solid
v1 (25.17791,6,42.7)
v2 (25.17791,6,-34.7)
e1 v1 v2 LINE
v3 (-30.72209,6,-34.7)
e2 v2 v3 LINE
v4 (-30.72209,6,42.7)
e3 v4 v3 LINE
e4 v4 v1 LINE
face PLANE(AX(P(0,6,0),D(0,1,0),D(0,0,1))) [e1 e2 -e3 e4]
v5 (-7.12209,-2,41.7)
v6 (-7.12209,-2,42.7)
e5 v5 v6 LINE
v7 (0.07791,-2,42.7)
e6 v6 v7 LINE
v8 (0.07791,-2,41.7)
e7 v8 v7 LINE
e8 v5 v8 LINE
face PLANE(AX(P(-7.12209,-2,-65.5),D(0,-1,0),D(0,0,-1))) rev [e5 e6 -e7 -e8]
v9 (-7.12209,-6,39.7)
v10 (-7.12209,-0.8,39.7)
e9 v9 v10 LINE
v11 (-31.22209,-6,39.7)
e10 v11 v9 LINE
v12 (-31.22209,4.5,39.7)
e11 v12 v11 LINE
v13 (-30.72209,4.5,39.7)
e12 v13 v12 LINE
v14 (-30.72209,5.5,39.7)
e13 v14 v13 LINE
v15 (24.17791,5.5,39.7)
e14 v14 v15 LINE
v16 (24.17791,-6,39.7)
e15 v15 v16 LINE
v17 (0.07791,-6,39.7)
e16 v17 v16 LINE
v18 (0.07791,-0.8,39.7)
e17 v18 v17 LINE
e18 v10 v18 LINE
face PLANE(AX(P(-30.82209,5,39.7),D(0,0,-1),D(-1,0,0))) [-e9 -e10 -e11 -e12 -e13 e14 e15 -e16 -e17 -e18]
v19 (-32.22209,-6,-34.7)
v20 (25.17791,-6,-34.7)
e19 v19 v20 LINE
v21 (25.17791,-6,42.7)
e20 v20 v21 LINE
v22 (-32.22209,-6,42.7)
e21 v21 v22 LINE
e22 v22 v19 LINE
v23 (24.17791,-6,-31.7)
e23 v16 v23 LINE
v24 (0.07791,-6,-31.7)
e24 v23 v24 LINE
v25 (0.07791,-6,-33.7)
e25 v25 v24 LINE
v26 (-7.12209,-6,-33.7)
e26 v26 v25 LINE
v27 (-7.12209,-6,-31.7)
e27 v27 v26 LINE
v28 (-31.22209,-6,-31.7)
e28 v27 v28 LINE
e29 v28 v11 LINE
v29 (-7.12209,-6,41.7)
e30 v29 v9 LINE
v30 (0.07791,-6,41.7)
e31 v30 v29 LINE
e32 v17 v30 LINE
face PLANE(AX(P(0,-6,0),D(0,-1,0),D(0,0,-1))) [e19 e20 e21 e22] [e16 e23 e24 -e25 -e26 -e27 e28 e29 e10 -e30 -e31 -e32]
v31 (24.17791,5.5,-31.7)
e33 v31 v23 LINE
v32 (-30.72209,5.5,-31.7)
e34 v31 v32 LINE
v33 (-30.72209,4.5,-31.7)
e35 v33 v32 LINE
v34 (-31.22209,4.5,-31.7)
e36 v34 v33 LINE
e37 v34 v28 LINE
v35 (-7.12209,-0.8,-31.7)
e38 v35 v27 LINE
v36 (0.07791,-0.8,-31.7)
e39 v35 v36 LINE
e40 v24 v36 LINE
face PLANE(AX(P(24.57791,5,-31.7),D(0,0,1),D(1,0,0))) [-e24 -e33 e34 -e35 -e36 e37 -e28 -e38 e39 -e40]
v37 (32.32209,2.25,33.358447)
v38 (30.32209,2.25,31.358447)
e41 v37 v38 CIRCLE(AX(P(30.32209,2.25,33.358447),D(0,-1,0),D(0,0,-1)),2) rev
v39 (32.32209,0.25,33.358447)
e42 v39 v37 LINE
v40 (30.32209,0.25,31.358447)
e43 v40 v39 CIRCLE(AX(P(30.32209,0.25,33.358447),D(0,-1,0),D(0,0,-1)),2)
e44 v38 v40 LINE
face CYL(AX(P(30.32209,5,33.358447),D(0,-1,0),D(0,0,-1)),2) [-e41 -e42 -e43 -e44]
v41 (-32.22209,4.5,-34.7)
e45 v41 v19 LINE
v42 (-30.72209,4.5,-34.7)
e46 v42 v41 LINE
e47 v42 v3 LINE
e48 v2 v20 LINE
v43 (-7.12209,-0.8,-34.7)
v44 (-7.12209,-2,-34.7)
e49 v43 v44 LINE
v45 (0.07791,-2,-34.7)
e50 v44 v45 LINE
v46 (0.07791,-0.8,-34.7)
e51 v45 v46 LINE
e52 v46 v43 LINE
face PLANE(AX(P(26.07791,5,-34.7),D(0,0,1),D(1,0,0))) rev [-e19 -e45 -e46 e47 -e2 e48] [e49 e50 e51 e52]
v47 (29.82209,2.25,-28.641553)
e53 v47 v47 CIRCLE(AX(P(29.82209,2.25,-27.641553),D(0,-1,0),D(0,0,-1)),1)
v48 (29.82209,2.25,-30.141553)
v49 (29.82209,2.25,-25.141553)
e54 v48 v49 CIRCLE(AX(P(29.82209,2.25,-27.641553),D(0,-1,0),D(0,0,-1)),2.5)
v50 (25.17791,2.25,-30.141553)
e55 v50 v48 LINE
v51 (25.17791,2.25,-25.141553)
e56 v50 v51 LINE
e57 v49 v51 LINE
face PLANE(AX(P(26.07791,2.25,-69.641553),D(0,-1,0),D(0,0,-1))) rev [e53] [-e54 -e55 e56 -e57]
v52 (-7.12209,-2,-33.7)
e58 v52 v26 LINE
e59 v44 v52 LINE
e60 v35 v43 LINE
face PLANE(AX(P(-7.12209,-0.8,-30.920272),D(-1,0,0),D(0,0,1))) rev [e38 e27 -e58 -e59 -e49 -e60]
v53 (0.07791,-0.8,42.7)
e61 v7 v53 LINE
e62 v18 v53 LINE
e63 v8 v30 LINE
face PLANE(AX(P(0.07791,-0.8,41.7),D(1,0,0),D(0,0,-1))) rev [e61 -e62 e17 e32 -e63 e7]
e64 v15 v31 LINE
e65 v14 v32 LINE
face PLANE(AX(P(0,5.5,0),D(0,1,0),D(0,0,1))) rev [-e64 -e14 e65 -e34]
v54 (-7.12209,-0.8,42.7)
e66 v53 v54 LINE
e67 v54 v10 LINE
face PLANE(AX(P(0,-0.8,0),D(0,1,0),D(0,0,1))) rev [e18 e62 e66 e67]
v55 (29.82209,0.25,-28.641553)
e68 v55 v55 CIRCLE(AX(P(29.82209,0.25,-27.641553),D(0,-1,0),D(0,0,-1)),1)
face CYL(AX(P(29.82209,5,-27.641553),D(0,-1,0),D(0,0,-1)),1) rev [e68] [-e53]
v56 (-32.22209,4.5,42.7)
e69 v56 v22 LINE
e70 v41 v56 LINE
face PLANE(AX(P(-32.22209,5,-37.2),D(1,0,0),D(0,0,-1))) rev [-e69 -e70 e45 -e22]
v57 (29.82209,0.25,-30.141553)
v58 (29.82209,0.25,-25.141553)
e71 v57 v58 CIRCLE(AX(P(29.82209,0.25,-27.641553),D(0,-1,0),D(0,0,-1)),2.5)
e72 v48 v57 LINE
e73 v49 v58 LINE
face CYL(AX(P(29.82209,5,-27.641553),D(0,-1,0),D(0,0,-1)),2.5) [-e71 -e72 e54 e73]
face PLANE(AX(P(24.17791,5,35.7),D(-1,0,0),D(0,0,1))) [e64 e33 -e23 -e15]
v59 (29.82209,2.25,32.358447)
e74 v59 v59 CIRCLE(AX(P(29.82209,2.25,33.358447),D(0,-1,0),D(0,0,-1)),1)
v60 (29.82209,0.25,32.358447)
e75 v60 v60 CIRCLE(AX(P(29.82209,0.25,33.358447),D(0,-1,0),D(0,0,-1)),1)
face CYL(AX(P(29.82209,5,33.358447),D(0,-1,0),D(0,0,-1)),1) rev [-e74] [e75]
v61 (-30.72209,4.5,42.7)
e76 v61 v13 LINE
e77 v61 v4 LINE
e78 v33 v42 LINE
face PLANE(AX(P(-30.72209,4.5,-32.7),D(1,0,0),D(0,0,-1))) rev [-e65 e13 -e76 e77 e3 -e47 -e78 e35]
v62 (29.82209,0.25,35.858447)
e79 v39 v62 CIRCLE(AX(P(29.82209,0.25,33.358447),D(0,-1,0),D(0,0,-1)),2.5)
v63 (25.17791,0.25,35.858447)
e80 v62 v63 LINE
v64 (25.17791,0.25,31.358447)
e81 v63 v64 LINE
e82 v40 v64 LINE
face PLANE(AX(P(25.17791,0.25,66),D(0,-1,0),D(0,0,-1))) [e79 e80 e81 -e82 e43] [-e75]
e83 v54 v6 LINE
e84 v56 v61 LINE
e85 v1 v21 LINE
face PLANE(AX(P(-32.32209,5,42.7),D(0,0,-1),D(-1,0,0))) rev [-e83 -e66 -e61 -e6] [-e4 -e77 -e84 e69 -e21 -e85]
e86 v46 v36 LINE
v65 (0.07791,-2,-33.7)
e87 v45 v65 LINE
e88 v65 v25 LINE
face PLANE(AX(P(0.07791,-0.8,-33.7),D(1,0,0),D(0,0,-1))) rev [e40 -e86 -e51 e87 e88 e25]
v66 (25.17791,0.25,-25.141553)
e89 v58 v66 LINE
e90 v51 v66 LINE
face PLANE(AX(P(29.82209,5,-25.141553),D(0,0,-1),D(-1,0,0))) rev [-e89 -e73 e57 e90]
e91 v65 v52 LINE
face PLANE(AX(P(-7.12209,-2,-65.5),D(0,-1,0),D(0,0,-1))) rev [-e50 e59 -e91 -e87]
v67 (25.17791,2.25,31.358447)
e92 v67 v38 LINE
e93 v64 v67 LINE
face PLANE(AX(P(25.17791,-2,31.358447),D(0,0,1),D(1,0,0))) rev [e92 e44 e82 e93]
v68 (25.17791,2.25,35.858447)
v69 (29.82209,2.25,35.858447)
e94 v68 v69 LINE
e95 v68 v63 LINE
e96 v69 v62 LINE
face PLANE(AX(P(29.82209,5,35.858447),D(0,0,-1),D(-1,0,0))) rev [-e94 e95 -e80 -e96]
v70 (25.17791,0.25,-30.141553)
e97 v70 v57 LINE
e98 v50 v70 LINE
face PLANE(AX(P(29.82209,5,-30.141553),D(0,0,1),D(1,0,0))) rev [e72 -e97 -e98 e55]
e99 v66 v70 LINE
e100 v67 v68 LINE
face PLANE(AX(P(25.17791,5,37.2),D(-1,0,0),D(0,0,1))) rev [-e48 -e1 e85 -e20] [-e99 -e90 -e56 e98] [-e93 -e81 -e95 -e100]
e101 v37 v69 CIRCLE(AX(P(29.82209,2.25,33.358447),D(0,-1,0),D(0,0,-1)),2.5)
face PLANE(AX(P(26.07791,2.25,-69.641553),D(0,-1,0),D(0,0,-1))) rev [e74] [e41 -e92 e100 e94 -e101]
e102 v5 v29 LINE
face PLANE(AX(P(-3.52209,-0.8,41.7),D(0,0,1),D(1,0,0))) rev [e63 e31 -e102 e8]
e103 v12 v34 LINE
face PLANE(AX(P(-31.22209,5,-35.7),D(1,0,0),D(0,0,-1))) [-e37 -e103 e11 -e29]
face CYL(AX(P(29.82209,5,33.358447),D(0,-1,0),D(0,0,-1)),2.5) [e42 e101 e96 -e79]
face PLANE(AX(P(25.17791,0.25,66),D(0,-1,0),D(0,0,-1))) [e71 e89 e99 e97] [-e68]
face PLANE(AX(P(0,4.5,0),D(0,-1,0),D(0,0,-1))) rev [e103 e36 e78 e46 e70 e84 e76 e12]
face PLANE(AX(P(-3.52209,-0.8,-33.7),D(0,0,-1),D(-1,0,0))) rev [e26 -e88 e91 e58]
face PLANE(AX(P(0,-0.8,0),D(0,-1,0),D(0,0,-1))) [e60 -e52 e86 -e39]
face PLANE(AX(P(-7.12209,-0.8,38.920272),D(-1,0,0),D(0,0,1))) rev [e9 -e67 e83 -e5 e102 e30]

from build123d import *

# Parameters (mm, degrees)
SKETCH1_R                = 1
SKETCH1_W                = 55.4
SKETCH1_H                = 71.4
BOSS_EXTRUDE1_DEPTH      = 5
SKETCH2_W                = 55.4
SKETCH2_H                = 71.4
BOSS_EXTRUDE2_DEPTH      = 1.5
SKETCH4_W                = 7.703515063
SKETCH4_H                = 8.608986158
CUT_EXTRUDE1_DEPTH       = 105.5
MOVE_FACE1_BY            = 7
MOVE_FACE2_BY            = 7.5
MOVE_FACE3_BY            = 4
MOVE_FACE3_2_BY          = 4
MOVE_FACE4_BY            = 4
MOVE_FACE4_2_BY          = 4
MOVE_FACE5_BY            = 0.4
MOVE_FACE5_2_BY          = 0.4
MOVE_FACE6_BY            = 0.4
MOVE_FACE6_2_BY          = 0.4
MOVE_START               = 3
MOVE_FACE7_OUTLINE_W     = 58.4
MOVE_FACE7_OUTLINE_H     = 74.4
MOVE_FACE7_OUTLINE_W_2   = 55.4
MOVE_FACE7_OUTLINE_H_2   = 71.4
MOVE_FACE7_DEPTH         = 2
MOVE_START_2             = -25.141552832
MOVE_FACE8_OUTLINE_W     = 0.5
MOVE_FACE8_OUTLINE_H     = 10
MOVE_FACE8_DEPTH         = 56
MOVE_START_3             = -33.2
MOVE_FACE8_2_OUTLINE_W   = 58.4
MOVE_FACE8_2_OUTLINE_H   = 10
MOVE_FACE8_2_DEPTH       = 0.5
MOVE_START_4             = 40.7
MOVE_FACE8_3_OUTLINE_W   = 58.4
MOVE_FACE8_3_OUTLINE_H   = 10
MOVE_FACE8_3_DEPTH       = 0.5
MOVE_START_5             = -32.7
MOVE_FACE8_4_OUTLINE_W   = 0.5
MOVE_FACE8_4_OUTLINE_H   = 10
MOVE_FACE8_4_OUTLINE_H_2 = 1
MOVE_FACE8_4_DEPTH       = 73.4
MOVE_START_6             = 35.858447168
MOVE_FACE8_5_OUTLINE_W   = 0.5
MOVE_FACE8_5_OUTLINE_H   = 9
MOVE_FACE8_5_DEPTH       = 4.841552832
MOVE_FACE8_6_OUTLINE_W   = 0.5
MOVE_FACE8_6_OUTLINE_H   = 9
MOVE_FACE8_6_DEPTH       = 2.558447168
CUT_EXTRUDE2_DEPTH       = 66
CUT_EXTRUDE2_DEPTH_BACK  = 64
SKETCH5_W                = 9.341764375
SKETCH5_H                = 8.237393027
CUT_EXTRUDE3_DEPTH       = 4
FILLET3_R                = 2
MOVE_FACE9_OUTLINE_W     = 57.4
MOVE_FACE9_OUTLINE_H     = 73.4
MOVE_FACE9_OUTLINE_W_2   = 55.4
MOVE_FACE9_OUTLINE_H_2   = 71.4
MOVE_FACE9_DEPTH         = 2.5
SKETCH7_W                = 57.4
SKETCH7_H                = 73.4
BOSS_EXTRUDE3_DEPTH      = 0.5
SKETCH8_W                = 57.4
SKETCH8_H                = 73.4
CUT_EXTRUDE4_DEPTH       = 1
MOVE_FACE10_BY           = 0.25
MOVE_FACE10_2_BY         = 0.25
MOVE_FACE11_BY           = 0.25
MOVE_FACE11_2_BY         = 0.25
SKETCH9_W                = 1.5
SKETCH9_H                = 73.4
CUT_EXTRUDE5_DEPTH       = 1.5
MOVE_START_7             = -34.7
MOVE_FACE12_DEPTH        = 2
MOVE_FACE12_2_DEPTH      = 2
CUT_EXTRUDE6_DEPTH       = 5.2
SKETCH12_W               = 7.2
SKETCH12_H               = 1.2
CUT_EXTRUDE7_DEPTH       = 108.2


# Read off the part's stored shape, not the designer's step: Move Face7, Move Face8, Move Face9, Move Face12
with BuildPart() as part:
    # Sketch1 → Boss-Extrude1 (new body)
    with BuildSketch(Plane(origin=(0, 0, 0), x_dir=(1, 0, 0), z_dir=(0, 1, 0))):
        with BuildLine():
            Line((26.077909727, -37.2), (26.077909727, -35.858447168))
            Line((26.077909727, -35.858447168), (29.822090273, -35.858447168))
            ThreePointArc((29.822090273, -35.858447168), (32.322090273, -33.358447168), (29.822090273, -30.858447168))
            Line((29.822090273, -30.858447168), (26.077909727, -30.858447168))
            Line((26.077909727, -30.858447168), (26.077909727, 25.141552832))
            Line((26.077909727, 25.141552832), (29.822090273, 25.141552832))
            ThreePointArc((29.822090273, 25.141552832), (32.322090273, 27.641552832), (29.822090273, 30.141552832))
            Line((29.822090273, 30.141552832), (26.077909727, 30.141552832))
            Line((26.077909727, 30.141552832), (26.077909727, 37.2))
            Line((26.077909727, 37.2), (-32.322090273, 37.2))
            Line((-32.322090273, 37.2), (-32.322090273, -37.2))
            Line((-32.322090273, -37.2), (26.077909727, -37.2))
        make_face()
        with Locations(Location((29.822090273, 27.641552832, 0), (0, 0, 270))):
            Circle(SKETCH1_R, mode=Mode.SUBTRACT)
        with Locations(Location((29.822090273, -33.358447168, 0), (0, 0, 270))):
            Circle(SKETCH1_R, mode=Mode.SUBTRACT)
        with Locations((-3.122090273, 0)):
            Rectangle(SKETCH1_W, SKETCH1_H, mode=Mode.SUBTRACT)
    extrude(amount=BOSS_EXTRUDE1_DEPTH)

    # Sketch2 → Boss-Extrude2 (add)
    with BuildSketch(Plane(origin=(0, 0, 0), x_dir=(1, 0, 0), z_dir=(0, 1, 0))):
        with Locations((-3.122090273, 0)):
            Rectangle(SKETCH2_W, SKETCH2_H)
    extrude(amount=BOSS_EXTRUDE2_DEPTH)

    # Sketch4 → Cut-Extrude1 (cut)
    with BuildSketch(Plane.XY.offset(35.858447168)):
        with Locations((29.929667259, 6.304493079)):
            Rectangle(SKETCH4_W, SKETCH4_H)
    extrude(amount=-CUT_EXTRUDE1_DEPTH, mode=Mode.SUBTRACT)

    # Move Face1: a face moved outward by 7.0
    extrude(part.faces().sort_by_distance((-2.752621979, 0, 0.033029774))[0], amount=MOVE_FACE1_BY, dir=(0, -1, 0))

    # Move Face2: a face moved inward by 7.5
    extrude(part.faces().sort_by_distance((-3.122090273, 1.5, 0))[0], amount=MOVE_FACE2_BY, dir=(0, -1, 0), mode=Mode.SUBTRACT)

    # Move Face3: a face moved outward by 4.0
    extrude(part.faces().sort_by_distance((-3.122090273, -1, 37.2))[0], amount=MOVE_FACE3_BY, dir=(0, 0, 1))

    # Move Face3 2: a face moved outward by 4.0
    extrude(part.faces().sort_by_distance((-3.122090273, -0.5, -35.7))[0], amount=MOVE_FACE3_2_BY, dir=(0, 0, 1))

    # Move Face4: a face moved inward by 4.0
    extrude(part.faces().sort_by_distance((-3.122090273, -0.5, 35.7))[0], amount=MOVE_FACE4_BY, dir=(0, 0, 1), mode=Mode.SUBTRACT)

    # Move Face4 2: a face moved inward by 4.0
    extrude(part.faces().sort_by_distance((-3.122090273, -1, -37.2))[0], amount=MOVE_FACE4_2_BY, dir=(0, 0, 1), mode=Mode.SUBTRACT)

    # Move Face5: a face moved outward by 0.4
    extrude(part.faces().sort_by_distance((24.577909727, -0.5, 4))[0], amount=MOVE_FACE5_BY, dir=(-1, 0, 0))

    # Move Face5 2: a face moved outward by 0.4
    extrude(part.faces().sort_by_distance((-32.322090273, -1, 4))[0], amount=MOVE_FACE5_2_BY, dir=(-1, 0, 0))

    # Move Face6: a face moved inward by 0.4
    extrude(part.faces().sort_by_distance((-30.822090273, -0.5, 4))[0], amount=MOVE_FACE6_BY, dir=(-1, 0, 0), mode=Mode.SUBTRACT)

    # Move Face6 2: a face moved inward by 0.4
    extrude(part.faces().sort_by_distance((26.077909727, -0.831838565, 4.127976775))[0], amount=MOVE_FACE6_2_BY, dir=(-1, 0, 0), mode=Mode.SUBTRACT)

    # Move Face7 outline → Move Face7 (cut)
    with BuildSketch(Plane(origin=(0, 0, 0), x_dir=(1, 0, 0), z_dir=(0, 1, 0)).offset(MOVE_START)):
        with Locations((-3.522090273, -4)):
            Rectangle(MOVE_FACE7_OUTLINE_W, MOVE_FACE7_OUTLINE_H)
        with Locations((-3.522090273, -4)):
            Rectangle(MOVE_FACE7_OUTLINE_W_2, MOVE_FACE7_OUTLINE_H_2, mode=Mode.SUBTRACT)
    extrude(amount=MOVE_FACE7_DEPTH, mode=Mode.SUBTRACT)

    # Move Face8 outline → Move Face8 (cut)
    with BuildSketch(Plane.XY.offset(MOVE_START_2)):
        with Locations((-32.472090273, -2)):
            Rectangle(MOVE_FACE8_OUTLINE_W, MOVE_FACE8_OUTLINE_H)
        with Locations((25.427909727, -2)):
            Rectangle(MOVE_FACE8_OUTLINE_W, MOVE_FACE8_OUTLINE_H)
    extrude(amount=MOVE_FACE8_DEPTH, mode=Mode.SUBTRACT)

    # Move Face8 2 outline → Move Face8 2 (cut)
    with BuildSketch(Plane.XY.offset(MOVE_START_3)):
        with Locations((-3.522090273, -2)):
            Rectangle(MOVE_FACE8_2_OUTLINE_W, MOVE_FACE8_2_OUTLINE_H)
    extrude(amount=MOVE_FACE8_2_DEPTH, mode=Mode.SUBTRACT)

    # Move Face8 3 outline → Move Face8 3 (cut)
    with BuildSketch(Plane.XY.offset(MOVE_START_4)):
        with Locations((-3.522090273, -2)):
            Rectangle(MOVE_FACE8_3_OUTLINE_W, MOVE_FACE8_3_OUTLINE_H)
    extrude(amount=MOVE_FACE8_3_DEPTH, mode=Mode.SUBTRACT)

    # Move Face8 4 outline → Move Face8 4 (cut)
    with BuildSketch(Plane.XY.offset(MOVE_START_5)):
        with Locations((-32.472090273, -2)):
            Rectangle(MOVE_FACE8_4_OUTLINE_W, MOVE_FACE8_4_OUTLINE_H)
        with Locations((25.427909727, 2.5)):
            Rectangle(MOVE_FACE8_4_OUTLINE_W, MOVE_FACE8_4_OUTLINE_H_2)
    extrude(amount=MOVE_FACE8_4_DEPTH, mode=Mode.SUBTRACT)

    # Move Face8 5 outline → Move Face8 5 (cut)
    with BuildSketch(Plane.XY.offset(MOVE_START_6)):
        with Locations((25.427909727, -2.5)):
            Rectangle(MOVE_FACE8_5_OUTLINE_W, MOVE_FACE8_5_OUTLINE_H)
    extrude(amount=MOVE_FACE8_5_DEPTH, mode=Mode.SUBTRACT)

    # Move Face8 6 outline → Move Face8 6 (cut)
    with BuildSketch(Plane.XY.offset(MOVE_START_5)):
        with Locations((25.427909727, -2.5)):
            Rectangle(MOVE_FACE8_6_OUTLINE_W, MOVE_FACE8_6_OUTLINE_H)
    extrude(amount=MOVE_FACE8_6_DEPTH, mode=Mode.SUBTRACT)

    # Sketch5 → Cut-Extrude2 (cut, two sides: drawn at the far end of the back side and taken through both)
    with BuildSketch(Plane.XY.offset(-CUT_EXTRUDE2_DEPTH_BACK)):
        with Locations((29.848791915, -4.118696514)):
            Rectangle(SKETCH5_W, SKETCH5_H)
    extrude(amount=CUT_EXTRUDE2_DEPTH + CUT_EXTRUDE2_DEPTH_BACK, mode=Mode.SUBTRACT)

    # Sketch6 → Cut-Extrude3 (cut)
    with BuildSketch(Plane(origin=(0, 2, 0), x_dir=(1, 0, 0), z_dir=(0, 1, 0))):
        Polygon((25.177909727, -30.858447168), (25.177909727, -31.358447168), (32.688438313, -31.358447168), (32.688438313, -30.19770306), (25.177909727, -30.19770306), align=None)
    extrude(amount=-CUT_EXTRUDE3_DEPTH, mode=Mode.SUBTRACT)

    # Fillet3
    fillet3_edges = [part.edges().sort_by_distance(p)[0] for p in [
        (31.322090273, 1, 31.358447168),
    ]]
    fillet(fillet3_edges, radius=FILLET3_R)

    # Move Face9 outline → Move Face9 (add)
    with BuildSketch(Plane(origin=(0, 0, 0), x_dir=(1, 0, 0), z_dir=(0, 1, 0)).offset(MOVE_START)):
        with Locations((-3.522090273, -4)):
            Rectangle(MOVE_FACE9_OUTLINE_W, MOVE_FACE9_OUTLINE_H)
        with Locations((-3.522090273, -4)):
            Rectangle(MOVE_FACE9_OUTLINE_W_2, MOVE_FACE9_OUTLINE_H_2, mode=Mode.SUBTRACT)
    extrude(amount=MOVE_FACE9_DEPTH)

    # Sketch7 → Boss-Extrude3 (add)
    with BuildSketch(Plane(origin=(0, 5.5, 0), x_dir=(1, 0, 0), z_dir=(0, 1, 0))):
        with Locations((-3.522090273, -4)):
            Rectangle(SKETCH7_W, SKETCH7_H)
    extrude(amount=BOSS_EXTRUDE3_DEPTH)

    # Sketch8 → Cut-Extrude4 (cut)
    with BuildSketch(Plane.XZ.offset(7)):
        with Locations((-3.522090273, 4)):
            Rectangle(SKETCH8_W, SKETCH8_H)
    extrude(amount=-CUT_EXTRUDE4_DEPTH, mode=Mode.SUBTRACT)

    # Move Face10: a face moved inward by 0.25
    extrude(part.faces().sort_by_distance((28.366938403, 0, -27.641552832))[0], amount=MOVE_FACE10_BY, dir=(0, 1, 0), mode=Mode.SUBTRACT)

    # Move Face10 2: a face moved inward by 0.25
    extrude(part.faces().sort_by_distance((28.373500925, 0, 33.610852536))[0], amount=MOVE_FACE10_2_BY, dir=(0, 1, 0), mode=Mode.SUBTRACT)

    # Move Face11: a face moved outward by 0.25
    extrude(part.faces().sort_by_distance((28.373500925, 2, 33.610852536))[0], amount=MOVE_FACE11_BY, dir=(0, 1, 0))

    # Move Face11 2: a face moved outward by 0.25
    extrude(part.faces().sort_by_distance((28.366938403, 2, -27.641552832))[0], amount=MOVE_FACE11_2_BY, dir=(0, 1, 0))

    # Sketch9 → Cut-Extrude5 (cut)
    with BuildSketch(Plane(origin=(0, 6, 0), x_dir=(1, 0, 0), z_dir=(0, 1, 0))):
        with Locations((-31.472090273, -4)):
            Rectangle(SKETCH9_W, SKETCH9_H)
    extrude(amount=-CUT_EXTRUDE5_DEPTH, mode=Mode.SUBTRACT)

    # Move Face12 outline → Move Face12 (add)
    with BuildSketch(Plane.XY.offset(MOVE_START_7)):
        Polygon((-32.222090273, 4.5), (-32.222090273, -6), (25.177909727, -6), (25.177909727, 6), (-30.722090273, 6), (-30.722090273, 4.5), align=None)
    extrude(amount=MOVE_FACE12_DEPTH)

    # Move Face12 2 outline → Move Face12 2 (add)
    with BuildSketch(Plane.XY.offset(MOVE_START_4)):
        Polygon((-32.222090273, 4.5), (-32.222090273, -6), (25.177909727, -6), (25.177909727, 6), (-30.722090273, 6), (-30.722090273, 4.5), align=None)
    extrude(amount=MOVE_FACE12_2_DEPTH)

    # Sketch10 → Cut-Extrude6 (cut)
    with BuildSketch(Plane.XZ.offset(6)):
        Polygon((-3.522090273, 41.7), (0.077909727, 41.7), (0.077909727, 38.920271818), (-7.122090273, 38.920271818), (-7.122090273, 41.7), align=None)
        Polygon((-7.122090273, -33.7), (-3.522090273, -33.7), (0.077909727, -33.7), (0.077909727, -30.920271818), (-7.122090273, -30.920271818), align=None)
    extrude(amount=-CUT_EXTRUDE6_DEPTH, mode=Mode.SUBTRACT)

    # Sketch12 → Cut-Extrude7 (cut)
    with BuildSketch(Plane.XY.offset(42.7)):
        with Locations((-3.522090273, -1.4)):
            Rectangle(SKETCH12_W, SKETCH12_H)
    extrude(amount=-CUT_EXTRUDE7_DEPTH, mode=Mode.SUBTRACT)


solid = part.part
